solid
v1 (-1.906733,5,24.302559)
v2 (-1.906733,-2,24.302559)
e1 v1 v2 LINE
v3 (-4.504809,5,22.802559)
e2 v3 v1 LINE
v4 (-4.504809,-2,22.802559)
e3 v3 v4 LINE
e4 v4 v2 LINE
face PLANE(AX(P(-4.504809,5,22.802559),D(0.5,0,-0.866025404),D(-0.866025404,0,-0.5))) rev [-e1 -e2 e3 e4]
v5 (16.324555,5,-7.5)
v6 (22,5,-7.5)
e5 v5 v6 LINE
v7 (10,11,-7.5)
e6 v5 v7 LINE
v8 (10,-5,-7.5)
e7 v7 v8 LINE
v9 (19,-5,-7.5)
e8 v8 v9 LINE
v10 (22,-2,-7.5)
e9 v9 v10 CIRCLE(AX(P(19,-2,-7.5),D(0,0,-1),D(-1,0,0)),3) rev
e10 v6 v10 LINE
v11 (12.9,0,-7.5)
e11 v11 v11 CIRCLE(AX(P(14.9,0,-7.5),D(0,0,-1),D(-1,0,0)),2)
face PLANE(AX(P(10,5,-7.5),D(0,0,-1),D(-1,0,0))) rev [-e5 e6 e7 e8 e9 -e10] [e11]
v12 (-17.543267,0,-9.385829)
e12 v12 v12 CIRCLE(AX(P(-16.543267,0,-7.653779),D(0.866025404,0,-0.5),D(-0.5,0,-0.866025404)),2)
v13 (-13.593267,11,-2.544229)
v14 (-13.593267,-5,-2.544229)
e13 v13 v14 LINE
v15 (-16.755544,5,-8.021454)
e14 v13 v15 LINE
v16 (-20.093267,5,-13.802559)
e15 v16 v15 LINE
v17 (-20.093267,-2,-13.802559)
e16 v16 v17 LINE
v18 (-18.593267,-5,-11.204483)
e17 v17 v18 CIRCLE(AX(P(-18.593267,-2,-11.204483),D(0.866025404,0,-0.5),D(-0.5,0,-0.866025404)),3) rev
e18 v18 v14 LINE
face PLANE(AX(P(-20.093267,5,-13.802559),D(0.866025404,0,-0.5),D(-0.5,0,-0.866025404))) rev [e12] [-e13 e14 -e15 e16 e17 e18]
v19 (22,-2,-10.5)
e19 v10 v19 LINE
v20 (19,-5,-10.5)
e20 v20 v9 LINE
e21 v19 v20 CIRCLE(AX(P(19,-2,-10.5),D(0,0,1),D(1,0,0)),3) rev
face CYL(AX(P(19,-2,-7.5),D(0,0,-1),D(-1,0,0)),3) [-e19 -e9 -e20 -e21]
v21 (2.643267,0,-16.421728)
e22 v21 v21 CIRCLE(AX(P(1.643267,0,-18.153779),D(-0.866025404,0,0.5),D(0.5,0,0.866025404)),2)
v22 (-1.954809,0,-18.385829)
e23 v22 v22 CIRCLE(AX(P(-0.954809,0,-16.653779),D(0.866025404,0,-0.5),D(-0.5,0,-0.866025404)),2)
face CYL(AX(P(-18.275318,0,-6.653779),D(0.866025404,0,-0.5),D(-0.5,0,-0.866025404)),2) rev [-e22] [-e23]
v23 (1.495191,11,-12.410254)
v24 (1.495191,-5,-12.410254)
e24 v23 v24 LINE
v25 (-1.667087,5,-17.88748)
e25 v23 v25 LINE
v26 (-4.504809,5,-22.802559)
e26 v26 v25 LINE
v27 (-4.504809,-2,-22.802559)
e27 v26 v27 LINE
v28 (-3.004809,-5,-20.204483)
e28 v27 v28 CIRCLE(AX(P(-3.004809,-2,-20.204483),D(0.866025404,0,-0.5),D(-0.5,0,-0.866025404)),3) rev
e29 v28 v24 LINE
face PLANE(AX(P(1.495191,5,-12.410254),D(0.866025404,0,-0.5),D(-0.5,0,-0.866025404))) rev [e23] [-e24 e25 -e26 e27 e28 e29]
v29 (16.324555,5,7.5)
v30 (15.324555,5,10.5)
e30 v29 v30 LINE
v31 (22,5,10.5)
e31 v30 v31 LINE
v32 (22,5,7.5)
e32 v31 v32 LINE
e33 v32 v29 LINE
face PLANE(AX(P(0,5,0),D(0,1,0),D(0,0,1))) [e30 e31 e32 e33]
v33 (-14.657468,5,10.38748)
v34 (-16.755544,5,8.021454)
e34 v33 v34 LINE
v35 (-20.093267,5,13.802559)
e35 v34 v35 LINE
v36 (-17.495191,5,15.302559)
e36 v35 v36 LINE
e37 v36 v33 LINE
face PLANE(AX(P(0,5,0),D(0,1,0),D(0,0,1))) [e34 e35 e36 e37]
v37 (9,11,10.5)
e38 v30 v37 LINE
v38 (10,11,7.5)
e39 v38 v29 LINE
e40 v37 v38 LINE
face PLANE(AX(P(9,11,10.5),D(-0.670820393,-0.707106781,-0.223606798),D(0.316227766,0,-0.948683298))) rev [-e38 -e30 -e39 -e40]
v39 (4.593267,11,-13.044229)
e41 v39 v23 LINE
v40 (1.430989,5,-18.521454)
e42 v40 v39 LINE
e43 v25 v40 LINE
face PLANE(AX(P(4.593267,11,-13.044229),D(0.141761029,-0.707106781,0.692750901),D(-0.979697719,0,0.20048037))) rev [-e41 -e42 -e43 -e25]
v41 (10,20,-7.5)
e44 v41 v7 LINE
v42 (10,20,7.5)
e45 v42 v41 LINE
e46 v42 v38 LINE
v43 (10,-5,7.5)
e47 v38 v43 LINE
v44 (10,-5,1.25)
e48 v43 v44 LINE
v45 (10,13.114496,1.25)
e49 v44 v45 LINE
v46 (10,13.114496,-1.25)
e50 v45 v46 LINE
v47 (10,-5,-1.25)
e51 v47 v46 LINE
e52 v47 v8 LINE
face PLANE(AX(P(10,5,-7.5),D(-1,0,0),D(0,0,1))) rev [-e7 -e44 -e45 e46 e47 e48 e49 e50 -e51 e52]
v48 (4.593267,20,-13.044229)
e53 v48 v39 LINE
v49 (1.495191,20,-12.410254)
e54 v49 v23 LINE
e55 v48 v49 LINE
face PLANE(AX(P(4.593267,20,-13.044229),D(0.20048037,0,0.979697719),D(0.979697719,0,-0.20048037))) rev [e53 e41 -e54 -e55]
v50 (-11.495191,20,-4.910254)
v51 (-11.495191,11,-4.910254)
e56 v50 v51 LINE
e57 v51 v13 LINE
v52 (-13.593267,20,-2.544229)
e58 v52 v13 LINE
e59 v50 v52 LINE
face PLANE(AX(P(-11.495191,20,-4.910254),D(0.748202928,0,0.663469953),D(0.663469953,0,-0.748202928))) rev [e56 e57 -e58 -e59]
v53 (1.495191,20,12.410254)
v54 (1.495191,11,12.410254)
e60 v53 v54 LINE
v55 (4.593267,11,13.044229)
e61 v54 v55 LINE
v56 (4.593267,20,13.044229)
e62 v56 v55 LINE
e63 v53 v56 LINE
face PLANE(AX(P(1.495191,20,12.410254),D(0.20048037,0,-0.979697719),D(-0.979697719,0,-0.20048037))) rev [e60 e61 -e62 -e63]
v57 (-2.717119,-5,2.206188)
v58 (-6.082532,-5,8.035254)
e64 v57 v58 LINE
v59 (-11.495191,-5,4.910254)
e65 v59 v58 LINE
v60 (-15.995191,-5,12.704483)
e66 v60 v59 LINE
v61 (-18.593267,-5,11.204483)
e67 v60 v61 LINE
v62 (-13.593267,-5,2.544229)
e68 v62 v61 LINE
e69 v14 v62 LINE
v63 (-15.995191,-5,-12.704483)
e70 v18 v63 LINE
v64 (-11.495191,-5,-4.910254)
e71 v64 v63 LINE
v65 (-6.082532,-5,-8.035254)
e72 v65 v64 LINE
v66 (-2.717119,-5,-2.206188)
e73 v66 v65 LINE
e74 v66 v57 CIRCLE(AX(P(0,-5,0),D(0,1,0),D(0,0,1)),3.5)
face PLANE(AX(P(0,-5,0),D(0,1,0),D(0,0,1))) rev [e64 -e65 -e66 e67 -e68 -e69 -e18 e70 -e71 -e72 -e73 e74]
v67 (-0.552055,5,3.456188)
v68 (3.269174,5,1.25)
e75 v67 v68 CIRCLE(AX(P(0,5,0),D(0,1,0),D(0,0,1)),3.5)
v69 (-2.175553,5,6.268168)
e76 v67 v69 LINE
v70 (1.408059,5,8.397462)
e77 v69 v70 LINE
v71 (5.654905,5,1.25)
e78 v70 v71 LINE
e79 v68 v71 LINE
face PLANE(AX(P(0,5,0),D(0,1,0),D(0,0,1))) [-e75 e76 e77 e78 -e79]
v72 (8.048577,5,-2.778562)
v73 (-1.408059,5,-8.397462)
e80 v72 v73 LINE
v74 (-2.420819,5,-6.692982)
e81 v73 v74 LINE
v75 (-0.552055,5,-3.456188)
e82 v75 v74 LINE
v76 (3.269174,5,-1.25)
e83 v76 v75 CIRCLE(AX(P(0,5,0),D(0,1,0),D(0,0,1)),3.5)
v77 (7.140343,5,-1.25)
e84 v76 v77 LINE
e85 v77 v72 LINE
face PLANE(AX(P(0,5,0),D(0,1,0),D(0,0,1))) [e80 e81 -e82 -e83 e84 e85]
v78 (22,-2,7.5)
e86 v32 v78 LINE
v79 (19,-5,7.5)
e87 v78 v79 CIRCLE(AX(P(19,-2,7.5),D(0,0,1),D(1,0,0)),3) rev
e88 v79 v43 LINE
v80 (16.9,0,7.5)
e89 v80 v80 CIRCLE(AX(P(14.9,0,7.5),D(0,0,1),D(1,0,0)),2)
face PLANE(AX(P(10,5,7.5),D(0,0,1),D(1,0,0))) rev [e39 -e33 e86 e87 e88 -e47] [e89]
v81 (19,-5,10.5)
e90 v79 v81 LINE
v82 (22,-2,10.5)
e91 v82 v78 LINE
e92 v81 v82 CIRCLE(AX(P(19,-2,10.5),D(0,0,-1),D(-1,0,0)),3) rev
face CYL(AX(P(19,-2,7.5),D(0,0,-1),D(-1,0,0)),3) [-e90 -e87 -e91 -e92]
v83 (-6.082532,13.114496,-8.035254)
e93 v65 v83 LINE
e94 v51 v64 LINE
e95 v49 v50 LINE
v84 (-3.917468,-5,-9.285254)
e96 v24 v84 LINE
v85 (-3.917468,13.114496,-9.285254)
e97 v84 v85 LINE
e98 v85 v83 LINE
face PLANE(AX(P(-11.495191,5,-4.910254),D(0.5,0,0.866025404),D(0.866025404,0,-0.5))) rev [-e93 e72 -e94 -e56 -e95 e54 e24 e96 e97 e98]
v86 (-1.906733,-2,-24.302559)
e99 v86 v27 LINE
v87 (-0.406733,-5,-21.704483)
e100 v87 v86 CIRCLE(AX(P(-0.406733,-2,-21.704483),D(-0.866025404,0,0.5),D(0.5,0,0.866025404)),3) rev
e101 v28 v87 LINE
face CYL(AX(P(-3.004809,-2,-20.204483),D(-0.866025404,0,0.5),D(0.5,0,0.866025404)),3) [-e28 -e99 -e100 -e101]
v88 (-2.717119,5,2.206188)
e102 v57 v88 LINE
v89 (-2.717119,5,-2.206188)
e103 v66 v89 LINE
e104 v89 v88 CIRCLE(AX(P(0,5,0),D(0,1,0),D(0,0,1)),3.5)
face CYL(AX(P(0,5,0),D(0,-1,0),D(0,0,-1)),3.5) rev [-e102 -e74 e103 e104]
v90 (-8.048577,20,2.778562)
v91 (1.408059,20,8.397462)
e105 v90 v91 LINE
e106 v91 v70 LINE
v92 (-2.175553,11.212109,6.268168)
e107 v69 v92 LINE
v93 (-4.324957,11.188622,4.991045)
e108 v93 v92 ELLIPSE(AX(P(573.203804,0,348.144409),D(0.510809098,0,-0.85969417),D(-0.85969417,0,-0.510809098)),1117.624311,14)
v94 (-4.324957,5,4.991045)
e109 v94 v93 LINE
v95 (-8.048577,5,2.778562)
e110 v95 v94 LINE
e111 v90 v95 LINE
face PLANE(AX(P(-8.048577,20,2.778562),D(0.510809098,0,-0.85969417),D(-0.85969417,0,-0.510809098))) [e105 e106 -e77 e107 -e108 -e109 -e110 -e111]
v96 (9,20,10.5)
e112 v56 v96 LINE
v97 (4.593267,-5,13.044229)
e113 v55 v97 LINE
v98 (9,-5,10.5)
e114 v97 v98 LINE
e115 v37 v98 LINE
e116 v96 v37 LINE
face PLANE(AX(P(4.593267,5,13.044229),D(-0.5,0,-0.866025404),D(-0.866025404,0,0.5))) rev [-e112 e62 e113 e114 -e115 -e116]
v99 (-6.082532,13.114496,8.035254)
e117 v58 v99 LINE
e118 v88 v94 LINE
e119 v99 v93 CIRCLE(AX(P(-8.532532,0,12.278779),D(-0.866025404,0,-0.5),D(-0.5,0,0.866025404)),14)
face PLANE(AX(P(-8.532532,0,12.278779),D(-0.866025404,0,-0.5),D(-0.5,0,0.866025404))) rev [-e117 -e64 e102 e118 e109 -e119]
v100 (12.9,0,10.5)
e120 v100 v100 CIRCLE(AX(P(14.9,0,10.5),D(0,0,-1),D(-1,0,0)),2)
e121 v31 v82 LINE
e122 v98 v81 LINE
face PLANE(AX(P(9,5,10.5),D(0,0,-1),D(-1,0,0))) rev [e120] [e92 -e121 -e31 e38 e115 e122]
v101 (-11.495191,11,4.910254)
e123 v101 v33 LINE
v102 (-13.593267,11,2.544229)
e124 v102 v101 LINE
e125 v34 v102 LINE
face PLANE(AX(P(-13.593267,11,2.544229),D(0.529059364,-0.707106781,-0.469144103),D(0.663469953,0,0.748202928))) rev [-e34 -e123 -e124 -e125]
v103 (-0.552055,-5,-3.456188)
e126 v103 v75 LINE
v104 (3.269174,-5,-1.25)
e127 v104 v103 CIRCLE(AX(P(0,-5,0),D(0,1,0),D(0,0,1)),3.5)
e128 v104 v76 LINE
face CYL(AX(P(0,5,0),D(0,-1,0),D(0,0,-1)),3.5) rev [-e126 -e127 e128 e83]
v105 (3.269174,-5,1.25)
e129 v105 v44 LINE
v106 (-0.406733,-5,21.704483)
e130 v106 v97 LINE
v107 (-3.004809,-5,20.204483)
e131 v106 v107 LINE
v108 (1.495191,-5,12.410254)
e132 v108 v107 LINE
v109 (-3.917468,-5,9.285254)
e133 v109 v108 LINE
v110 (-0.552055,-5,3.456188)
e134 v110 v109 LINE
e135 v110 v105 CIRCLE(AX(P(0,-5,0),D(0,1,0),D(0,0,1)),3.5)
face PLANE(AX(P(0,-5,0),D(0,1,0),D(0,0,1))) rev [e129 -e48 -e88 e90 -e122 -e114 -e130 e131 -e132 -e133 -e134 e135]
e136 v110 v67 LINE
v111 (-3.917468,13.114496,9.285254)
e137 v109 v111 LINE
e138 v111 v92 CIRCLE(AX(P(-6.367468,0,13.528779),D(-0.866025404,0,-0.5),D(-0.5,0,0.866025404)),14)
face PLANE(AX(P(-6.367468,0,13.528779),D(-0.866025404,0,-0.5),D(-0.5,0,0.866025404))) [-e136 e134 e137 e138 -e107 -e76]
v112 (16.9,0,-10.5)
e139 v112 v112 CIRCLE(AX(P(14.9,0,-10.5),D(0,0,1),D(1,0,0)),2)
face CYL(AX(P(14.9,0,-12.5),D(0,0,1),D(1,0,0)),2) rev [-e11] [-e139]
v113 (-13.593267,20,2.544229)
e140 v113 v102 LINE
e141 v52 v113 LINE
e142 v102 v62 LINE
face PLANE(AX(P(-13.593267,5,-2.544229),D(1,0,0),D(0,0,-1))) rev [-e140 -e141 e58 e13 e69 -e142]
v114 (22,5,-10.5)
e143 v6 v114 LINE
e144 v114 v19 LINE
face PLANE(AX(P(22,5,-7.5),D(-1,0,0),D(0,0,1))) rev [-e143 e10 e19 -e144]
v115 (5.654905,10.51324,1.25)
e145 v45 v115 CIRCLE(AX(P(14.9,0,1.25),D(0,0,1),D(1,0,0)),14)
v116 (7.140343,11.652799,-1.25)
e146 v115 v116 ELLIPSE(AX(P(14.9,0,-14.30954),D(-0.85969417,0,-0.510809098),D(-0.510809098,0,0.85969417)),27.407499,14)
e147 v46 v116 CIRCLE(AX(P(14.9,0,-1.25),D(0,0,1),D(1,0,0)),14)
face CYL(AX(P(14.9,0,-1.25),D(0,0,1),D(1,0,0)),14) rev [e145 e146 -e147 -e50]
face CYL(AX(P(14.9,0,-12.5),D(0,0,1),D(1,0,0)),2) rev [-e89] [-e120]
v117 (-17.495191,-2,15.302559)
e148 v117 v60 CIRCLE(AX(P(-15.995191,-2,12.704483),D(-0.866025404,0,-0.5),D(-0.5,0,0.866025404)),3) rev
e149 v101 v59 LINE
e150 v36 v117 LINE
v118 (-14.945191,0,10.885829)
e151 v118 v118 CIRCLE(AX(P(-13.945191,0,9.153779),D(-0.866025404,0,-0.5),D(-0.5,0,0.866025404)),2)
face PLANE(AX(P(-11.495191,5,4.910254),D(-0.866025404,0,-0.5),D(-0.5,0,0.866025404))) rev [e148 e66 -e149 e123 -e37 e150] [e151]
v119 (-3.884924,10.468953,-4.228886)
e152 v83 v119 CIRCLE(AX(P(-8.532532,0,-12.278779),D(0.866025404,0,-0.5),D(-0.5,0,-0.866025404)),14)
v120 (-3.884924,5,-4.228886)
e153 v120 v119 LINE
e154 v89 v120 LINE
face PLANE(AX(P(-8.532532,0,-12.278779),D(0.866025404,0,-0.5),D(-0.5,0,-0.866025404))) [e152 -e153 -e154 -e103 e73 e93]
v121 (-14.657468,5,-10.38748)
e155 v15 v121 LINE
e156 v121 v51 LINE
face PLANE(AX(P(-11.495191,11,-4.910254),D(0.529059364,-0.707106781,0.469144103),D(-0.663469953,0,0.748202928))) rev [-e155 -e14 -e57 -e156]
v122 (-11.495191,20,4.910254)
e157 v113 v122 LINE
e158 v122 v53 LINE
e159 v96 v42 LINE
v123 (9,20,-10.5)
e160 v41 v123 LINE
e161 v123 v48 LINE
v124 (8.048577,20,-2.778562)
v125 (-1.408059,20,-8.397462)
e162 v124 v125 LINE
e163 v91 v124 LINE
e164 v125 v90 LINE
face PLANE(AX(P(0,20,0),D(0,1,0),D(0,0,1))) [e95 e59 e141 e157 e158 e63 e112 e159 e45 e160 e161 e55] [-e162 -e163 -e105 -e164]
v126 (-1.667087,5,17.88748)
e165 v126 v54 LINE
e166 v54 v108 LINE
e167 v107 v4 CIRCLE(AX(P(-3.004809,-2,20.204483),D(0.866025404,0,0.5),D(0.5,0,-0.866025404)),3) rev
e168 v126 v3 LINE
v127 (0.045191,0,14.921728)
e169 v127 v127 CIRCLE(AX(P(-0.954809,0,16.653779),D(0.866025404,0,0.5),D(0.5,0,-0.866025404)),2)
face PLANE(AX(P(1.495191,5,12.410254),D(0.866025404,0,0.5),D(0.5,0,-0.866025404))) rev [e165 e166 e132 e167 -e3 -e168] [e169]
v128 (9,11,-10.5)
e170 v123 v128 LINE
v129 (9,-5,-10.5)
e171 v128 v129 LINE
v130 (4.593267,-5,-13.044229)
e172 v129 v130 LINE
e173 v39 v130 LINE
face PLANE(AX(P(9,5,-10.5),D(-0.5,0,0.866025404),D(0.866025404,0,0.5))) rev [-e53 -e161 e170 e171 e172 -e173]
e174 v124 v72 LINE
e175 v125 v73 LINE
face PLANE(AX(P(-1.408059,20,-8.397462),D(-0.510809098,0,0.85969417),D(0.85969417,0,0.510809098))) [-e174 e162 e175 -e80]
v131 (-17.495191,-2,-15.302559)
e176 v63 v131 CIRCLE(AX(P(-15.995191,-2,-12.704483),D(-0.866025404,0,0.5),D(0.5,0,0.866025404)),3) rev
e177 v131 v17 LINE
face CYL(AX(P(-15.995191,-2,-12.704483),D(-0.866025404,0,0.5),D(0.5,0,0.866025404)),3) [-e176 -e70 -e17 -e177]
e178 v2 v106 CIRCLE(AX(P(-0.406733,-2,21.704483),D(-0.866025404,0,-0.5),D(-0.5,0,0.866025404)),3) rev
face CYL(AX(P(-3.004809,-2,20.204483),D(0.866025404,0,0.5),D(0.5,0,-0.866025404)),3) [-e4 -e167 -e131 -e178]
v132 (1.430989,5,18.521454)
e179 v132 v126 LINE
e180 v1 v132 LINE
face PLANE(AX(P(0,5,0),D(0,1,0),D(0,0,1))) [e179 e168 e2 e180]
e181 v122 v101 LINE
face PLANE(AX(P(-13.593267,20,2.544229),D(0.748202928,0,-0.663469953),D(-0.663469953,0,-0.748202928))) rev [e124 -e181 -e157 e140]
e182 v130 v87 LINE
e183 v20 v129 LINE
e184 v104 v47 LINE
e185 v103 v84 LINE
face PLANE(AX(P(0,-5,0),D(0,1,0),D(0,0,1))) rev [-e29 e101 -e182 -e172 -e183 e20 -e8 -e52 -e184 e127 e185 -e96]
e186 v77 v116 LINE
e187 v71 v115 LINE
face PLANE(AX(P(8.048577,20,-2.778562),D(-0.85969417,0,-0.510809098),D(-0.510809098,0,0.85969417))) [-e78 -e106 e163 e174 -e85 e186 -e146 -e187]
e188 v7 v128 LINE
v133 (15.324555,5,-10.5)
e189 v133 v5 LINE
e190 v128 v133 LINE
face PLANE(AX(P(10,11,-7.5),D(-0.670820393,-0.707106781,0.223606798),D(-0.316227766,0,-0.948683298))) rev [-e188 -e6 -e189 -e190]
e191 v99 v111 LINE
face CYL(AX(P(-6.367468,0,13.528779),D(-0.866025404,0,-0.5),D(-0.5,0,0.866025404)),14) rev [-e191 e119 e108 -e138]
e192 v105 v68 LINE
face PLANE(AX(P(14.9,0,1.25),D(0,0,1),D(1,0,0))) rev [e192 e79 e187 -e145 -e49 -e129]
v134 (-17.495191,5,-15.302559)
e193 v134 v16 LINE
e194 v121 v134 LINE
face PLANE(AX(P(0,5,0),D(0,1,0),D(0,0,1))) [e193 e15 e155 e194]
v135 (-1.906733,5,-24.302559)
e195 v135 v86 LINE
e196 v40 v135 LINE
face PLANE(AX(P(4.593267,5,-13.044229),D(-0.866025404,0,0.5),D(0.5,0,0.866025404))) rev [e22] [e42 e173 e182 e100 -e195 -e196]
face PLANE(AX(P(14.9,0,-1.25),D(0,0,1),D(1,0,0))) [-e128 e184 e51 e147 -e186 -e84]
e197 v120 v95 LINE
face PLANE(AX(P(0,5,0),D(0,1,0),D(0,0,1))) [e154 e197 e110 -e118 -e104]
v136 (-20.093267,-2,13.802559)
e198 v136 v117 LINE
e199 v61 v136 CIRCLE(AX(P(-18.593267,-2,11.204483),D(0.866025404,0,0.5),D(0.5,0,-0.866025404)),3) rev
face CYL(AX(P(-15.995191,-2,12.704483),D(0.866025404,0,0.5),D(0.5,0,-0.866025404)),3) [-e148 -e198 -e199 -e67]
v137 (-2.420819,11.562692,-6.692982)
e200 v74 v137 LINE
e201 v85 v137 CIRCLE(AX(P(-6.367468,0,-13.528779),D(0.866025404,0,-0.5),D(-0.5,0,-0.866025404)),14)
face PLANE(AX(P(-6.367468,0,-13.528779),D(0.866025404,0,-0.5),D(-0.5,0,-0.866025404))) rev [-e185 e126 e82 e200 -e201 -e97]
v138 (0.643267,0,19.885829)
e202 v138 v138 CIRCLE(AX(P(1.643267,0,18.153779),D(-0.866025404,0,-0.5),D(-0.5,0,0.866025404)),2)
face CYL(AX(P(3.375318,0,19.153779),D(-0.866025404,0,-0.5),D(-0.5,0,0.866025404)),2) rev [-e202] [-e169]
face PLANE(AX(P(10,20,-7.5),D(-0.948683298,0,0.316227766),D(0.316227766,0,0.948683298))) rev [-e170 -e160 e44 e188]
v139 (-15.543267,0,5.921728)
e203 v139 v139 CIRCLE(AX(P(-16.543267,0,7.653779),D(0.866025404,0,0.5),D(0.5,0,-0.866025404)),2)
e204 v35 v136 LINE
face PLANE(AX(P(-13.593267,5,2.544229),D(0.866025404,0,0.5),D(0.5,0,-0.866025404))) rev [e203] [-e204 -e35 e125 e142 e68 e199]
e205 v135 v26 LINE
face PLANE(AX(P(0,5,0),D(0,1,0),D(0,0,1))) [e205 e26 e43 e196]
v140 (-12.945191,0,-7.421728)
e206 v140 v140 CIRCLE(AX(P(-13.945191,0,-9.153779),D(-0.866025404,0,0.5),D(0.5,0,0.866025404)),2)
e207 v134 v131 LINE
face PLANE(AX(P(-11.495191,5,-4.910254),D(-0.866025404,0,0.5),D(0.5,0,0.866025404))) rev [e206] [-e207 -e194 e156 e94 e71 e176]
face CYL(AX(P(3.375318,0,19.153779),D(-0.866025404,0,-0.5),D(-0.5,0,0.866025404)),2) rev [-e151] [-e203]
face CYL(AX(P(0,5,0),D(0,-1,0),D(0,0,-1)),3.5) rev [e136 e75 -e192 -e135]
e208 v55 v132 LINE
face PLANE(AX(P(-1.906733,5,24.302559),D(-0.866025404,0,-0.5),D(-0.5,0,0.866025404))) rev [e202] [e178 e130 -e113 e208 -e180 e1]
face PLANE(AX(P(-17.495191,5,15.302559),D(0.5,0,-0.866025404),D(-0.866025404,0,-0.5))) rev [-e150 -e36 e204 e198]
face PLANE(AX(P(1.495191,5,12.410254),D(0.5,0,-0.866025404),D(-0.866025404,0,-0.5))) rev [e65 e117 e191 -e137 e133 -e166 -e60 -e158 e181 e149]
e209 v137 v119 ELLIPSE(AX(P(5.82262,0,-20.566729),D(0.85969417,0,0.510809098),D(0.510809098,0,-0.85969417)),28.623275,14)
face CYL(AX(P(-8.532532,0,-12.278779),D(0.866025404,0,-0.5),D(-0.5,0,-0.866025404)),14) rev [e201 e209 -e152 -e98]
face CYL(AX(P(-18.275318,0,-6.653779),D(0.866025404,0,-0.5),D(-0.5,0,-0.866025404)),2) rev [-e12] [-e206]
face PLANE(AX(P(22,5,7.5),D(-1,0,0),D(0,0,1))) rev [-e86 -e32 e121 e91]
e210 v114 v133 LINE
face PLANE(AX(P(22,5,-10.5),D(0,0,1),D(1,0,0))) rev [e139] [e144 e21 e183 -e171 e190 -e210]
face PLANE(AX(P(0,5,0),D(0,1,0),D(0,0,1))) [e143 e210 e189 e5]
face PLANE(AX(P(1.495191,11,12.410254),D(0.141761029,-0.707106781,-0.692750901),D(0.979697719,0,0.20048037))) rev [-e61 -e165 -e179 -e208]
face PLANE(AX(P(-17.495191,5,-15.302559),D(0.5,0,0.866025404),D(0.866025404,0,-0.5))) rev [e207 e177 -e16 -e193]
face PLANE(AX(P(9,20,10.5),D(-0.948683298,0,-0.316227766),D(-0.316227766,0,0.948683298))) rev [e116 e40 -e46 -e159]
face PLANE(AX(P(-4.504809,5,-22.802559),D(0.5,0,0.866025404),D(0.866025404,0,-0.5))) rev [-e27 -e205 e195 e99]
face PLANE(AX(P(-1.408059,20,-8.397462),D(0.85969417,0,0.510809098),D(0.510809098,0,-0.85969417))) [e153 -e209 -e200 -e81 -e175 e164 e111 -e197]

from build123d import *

# Parameters (mm, degrees)
SKETCH1_R           = 3.5
BOSS_EXTRUDE1_DEPTH = 5
SKETCH2_R           = 2
CUT_EXTRUDE1_DEPTH  = 12.5
BOSS_EXTRUDE2_DEPTH = 15
CHAMFER1_SIZE       = 6
FILLET1_R           = 3
SKETCH6_R           = 14
CUT_EXTRUDE2_DEPTH  = 1.25
CIRPATTERN1_COUNT   = 3


with BuildPart() as part:
    # Sketch1 → Boss-Extrude1 (new, symmetric)
    with BuildSketch(Plane(origin=(0, 0, 0), x_dir=(1, 0, 0), z_dir=(0, 1, 0))):
        Polygon((10, 7.5), (10, -7.5), (22, -7.5), (22, -10.5), (9, -10.5), (4.59326674, -13.044228634), (-1.90673326, -24.302558883), (-4.504809472, -22.802558883), (1.495190528, -12.410254038), (-11.495190528, -4.910254038), (-17.495190528, -15.302558883), (-20.09326674, -13.802558883), (-13.59326674, -2.544228634), (-13.59326674, 2.544228634), (-20.09326674, 13.802558883), (-17.495190528, 15.302558883), (-11.495190528, 4.910254038), (1.495190528, 12.410254038), (-4.504809472, 22.802558883), (-1.90673326, 24.302558883), (4.59326674, 13.044228634), (9, 10.5), (22, 10.5), (22, 7.5), align=None)
        with Locations(Location((0, 0, 0), (0, 0, 270))):
            Circle(SKETCH1_R, mode=Mode.SUBTRACT)
    extrude(amount=BOSS_EXTRUDE1_DEPTH, both=True)

    # Sketch2 → Cut-Extrude1 (cut, symmetric)
    with BuildSketch(Plane(origin=(6.062177826, 0, 0), x_dir=(1, 0, 0), z_dir=(0, 0, 1))):
        with Locations((8.837822174, 0)):
            Circle(SKETCH2_R)
    cut_extrude1 = extrude(amount=CUT_EXTRUDE1_DEPTH, both=True, mode=Mode.SUBTRACT)

    # Sketch5 → Boss-Extrude2 (add)
    with BuildSketch(Plane(origin=(0, 5, 0), x_dir=(1, 0, 0), z_dir=(0, 1, 0))):
        Polygon((-11.495190528, 4.910254038), (-13.59326674, 2.544228634), (-13.59326674, -2.544228634), (-11.495190528, -4.910254038), (1.495190528, -12.410254038), (4.59326674, -13.044228634), (9, -10.5), (10, -7.5), (10, 7.5), (9, 10.5), (4.59326674, 13.044228634), (1.495190528, 12.410254038), align=None)
        Polygon((-1.408058794, 8.397462142), (8.048577071, 2.778562062), (1.408058794, -8.397462142), (-8.048577071, -2.778562062), align=None, mode=Mode.SUBTRACT)
    extrude(amount=BOSS_EXTRUDE2_DEPTH)

    # Chamfer1
    # the kernel refuses this chamfer: 6 mm, written as the material it adds along each edge
    with BuildSketch(Plane(origin=(14.879425397, 5, 7.138276191), x_dir=(0.9483246169389857, -0.027495876610586355, -0.31610820564632863), z_dir=(-0.31622776601683794, 0, -0.9486832980505138))) as chamfer1_piece_1_section:
        Polygon((CHAMFER1_SIZE * 0.999621916911, -CHAMFER1_SIZE * 0.0274958766106), (-CHAMFER1_SIZE * 0.0274958766106, -CHAMFER1_SIZE * 0.999621916911), (0, 0), align=None)
    chamfer1_piece_1 = extrude(amount=34.022473516, mode=Mode.PRIVATE)
    chamfer1_piece_1 = split(chamfer1_piece_1, bisect_by=Plane(origin=(10, 7.238305373, -8.343587756), z_dir=(1, 0, 0)), keep=Keep.TOP, mode=Mode.PRIVATE)
    chamfer1_piece_1 = split(chamfer1_piece_1, bisect_by=Plane(origin=(11.214187952, 7.238305373, -7.5), z_dir=(0, 0, -1)), keep=Keep.TOP, mode=Mode.PRIVATE)
    chamfer1_piece_1 = split(chamfer1_piece_1, bisect_by=Plane(origin=(11.594394856, 7.238305373, -9.002125431), z_dir=(-0.5000000000000008, 0, 0.8660254037844383)), keep=Keep.TOP, mode=Mode.PRIVATE)
    add(chamfer1_piece_1)
    with BuildSketch(Plane(origin=(14.879425397, 5, 7.138276191), x_dir=(0.9483246169389857, -0.027495876610586355, -0.31610820564632863), z_dir=(-0.31622776601683794, 0, -0.9486832980505138))) as chamfer1_piece_2_section:
        Polygon((CHAMFER1_SIZE * 0.999621916911, -CHAMFER1_SIZE * 0.0274958766106), (-CHAMFER1_SIZE * 0.0274958766106, -CHAMFER1_SIZE * 0.999621916911), (0, 0), align=None)
    chamfer1_piece_2 = extrude(amount=34.022473516, mode=Mode.PRIVATE)
    chamfer1_piece_2 = split(chamfer1_piece_2, bisect_by=Plane(origin=(10, 8.044690519, -9.214105908), z_dir=(-1, 0, 0)), keep=Keep.TOP, mode=Mode.PRIVATE)
    chamfer1_piece_2 = split(chamfer1_piece_2, bisect_by=Plane(origin=(9.590387414, 8.044690519, -7.5), z_dir=(0, 0, -1)), keep=Keep.TOP, mode=Mode.PRIVATE)
    chamfer1_piece_2 = split(chamfer1_piece_2, bisect_by=Plane(origin=(9.590387414, 8.044690519, -10.5), z_dir=(0, 0, 1)), keep=Keep.TOP, mode=Mode.PRIVATE)
    chamfer1_piece_2 = split(chamfer1_piece_2, bisect_by=Plane(origin=(9.999599036, 8.044690519, -9.922881228), z_dir=(-0.5000000000000008, 0, 0.8660254037844383)), keep=Keep.TOP, mode=Mode.PRIVATE)
    add(chamfer1_piece_2)
    with BuildSketch(Plane(origin=(14.879425397, 5, 7.138276191), x_dir=(0.9483246169389857, -0.027495876610586355, -0.31610820564632863), z_dir=(-0.31622776601683794, 0, -0.9486832980505138))) as chamfer1_piece_3_section:
        Polygon((CHAMFER1_SIZE * 0.999621916911, -CHAMFER1_SIZE * 0.0274958766106), (-CHAMFER1_SIZE * 0.0274958766106, -CHAMFER1_SIZE * 0.999621916911), (0, 0), align=None)
    chamfer1_piece_3 = extrude(amount=34.022473516, mode=Mode.PRIVATE)
    chamfer1_piece_3 = split(chamfer1_piece_3, bisect_by=Plane(origin=(10, 6.348975917, -9.386892546), z_dir=(1, 0, 0)), keep=Keep.TOP, mode=Mode.PRIVATE)
    chamfer1_piece_3 = split(chamfer1_piece_3, bisect_by=Plane(origin=(12.707905093, 6.348975917, -7.5), z_dir=(0, 0, -1)), keep=Keep.TOP, mode=Mode.PRIVATE)
    chamfer1_piece_3 = split(chamfer1_piece_3, bisect_by=Plane(origin=(12.707905093, 6.348975917, -10.5), z_dir=(0, 0, 1)), keep=Keep.TOP, mode=Mode.PRIVATE)
    chamfer1_piece_3 = split(chamfer1_piece_3, bisect_by=Plane(origin=(12.262918486, 6.348975917, -8.616153134), z_dir=(0.5000000000000008, 0, -0.8660254037844383)), keep=Keep.TOP, mode=Mode.PRIVATE)
    add(chamfer1_piece_3)
    with BuildSketch(Plane(origin=(14.879425397, 5, 7.138276191), x_dir=(0.9483246169389857, -0.027495876610586355, -0.31610820564632863), z_dir=(-0.31622776601683794, 0, -0.9486832980505138))) as chamfer1_piece_4_section:
        Polygon((CHAMFER1_SIZE * 0.999621916911, -CHAMFER1_SIZE * 0.0274958766106), (-CHAMFER1_SIZE * 0.0274958766106, -CHAMFER1_SIZE * 0.999621916911), (0, 0), align=None)
    chamfer1_piece_4 = extrude(amount=34.022473516, mode=Mode.PRIVATE)
    chamfer1_piece_4 = split(chamfer1_piece_4, bisect_by=Plane(origin=(10, 7.664220287, -10.309273658), z_dir=(-1, 0, 0)), keep=Keep.TOP, mode=Mode.PRIVATE)
    chamfer1_piece_4 = split(chamfer1_piece_4, bisect_by=Plane(origin=(9.657905234, 7.664220287, -10.5), z_dir=(0, 0, 1)), keep=Keep.TOP, mode=Mode.PRIVATE)
    chamfer1_piece_4 = split(chamfer1_piece_4, bisect_by=Plane(origin=(9.576015854, 7.664220287, -10.167437092), z_dir=(0.5000000000000008, 0, -0.8660254037844383)), keep=Keep.TOP, mode=Mode.PRIVATE)
    add(chamfer1_piece_4)
    with BuildSketch(Plane(origin=(19.710098488, 5, -16.13766038), x_dir=(-0.20040457203505768, -0.027495876610586337, -0.9793273121264722), z_dir=(-0.979697719266168, 0, 0.2004803702726748))) as chamfer1_piece_5_section:
        Polygon((CHAMFER1_SIZE * 0.999621916911, -CHAMFER1_SIZE * 0.0274958766106), (-CHAMFER1_SIZE * 0.0274958766106, -CHAMFER1_SIZE * 0.999621916911), (0, 0), align=None)
    chamfer1_piece_5 = extrude(amount=34.022473516, mode=Mode.PRIVATE)
    chamfer1_piece_5 = split(chamfer1_piece_5, bisect_by=Plane(origin=(3.928092882, 7.664220287, -13.814890867), z_dir=(0.5000000000000004, 0, 0.8660254037844385)), keep=Keep.TOP, mode=Mode.PRIVATE)
    chamfer1_piece_5 = split(chamfer1_piece_5, bisect_by=Plane(origin=(4.264314123, 7.664220287, -13.61399128), z_dir=(-0.8660254037844384, 0, 0.5000000000000006)), keep=Keep.TOP, mode=Mode.PRIVATE)
    chamfer1_piece_5 = split(chamfer1_piece_5, bisect_by=Plane(origin=(4.017250886, 7.664220287, -13.376791542), z_dir=(0.5000000000000008, 0, -0.8660254037844383)), keep=Keep.TOP, mode=Mode.PRIVATE)
    add(chamfer1_piece_5)
    with BuildSketch(Plane(origin=(19.710098488, 5, -16.13766038), x_dir=(-0.20040457203505768, -0.027495876610586337, -0.9793273121264722), z_dir=(-0.979697719266168, 0, 0.2004803702726748))) as chamfer1_piece_6_section:
        Polygon((CHAMFER1_SIZE * 0.999621916911, -CHAMFER1_SIZE * 0.0274958766106), (-CHAMFER1_SIZE * 0.0274958766106, -CHAMFER1_SIZE * 0.999621916911), (0, 0), align=None)
    chamfer1_piece_6 = extrude(amount=34.022473516, mode=Mode.PRIVATE)
    chamfer1_piece_6 = split(chamfer1_piece_6, bisect_by=Plane(origin=(2.97964979, 8.044690519, -13.267306992), z_dir=(0.5000000000000004, 0, 0.8660254037844385)), keep=Keep.TOP, mode=Mode.PRIVATE)
    chamfer1_piece_6 = split(chamfer1_piece_6, bisect_by=Plane(origin=(1.699996821, 8.044690519, -12.055519133), z_dir=(0.8660254037844385, 0, -0.5000000000000004)), keep=Keep.TOP, mode=Mode.PRIVATE)
    chamfer1_piece_6 = split(chamfer1_piece_6, bisect_by=Plane(origin=(4.298073033, 8.044690519, -13.555519133), z_dir=(-0.8660254037844384, 0, 0.5000000000000006)), keep=Keep.TOP, mode=Mode.PRIVATE)
    chamfer1_piece_6 = split(chamfer1_piece_6, bisect_by=Plane(origin=(3.593667704, 8.044690519, -13.621347406), z_dir=(-0.5000000000000008, 0, 0.8660254037844383)), keep=Keep.TOP, mode=Mode.PRIVATE)
    add(chamfer1_piece_6)
    with BuildSketch(Plane(origin=(19.710098488, 5, -16.13766038), x_dir=(-0.20040457203505768, -0.027495876610586337, -0.9793273121264722), z_dir=(-0.979697719266168, 0, 0.2004803702726748))) as chamfer1_piece_7_section:
        Polygon((CHAMFER1_SIZE * 0.999621916911, -CHAMFER1_SIZE * 0.0274958766106), (-CHAMFER1_SIZE * 0.0274958766106, -CHAMFER1_SIZE * 0.999621916911), (0, 0), align=None)
    chamfer1_piece_7 = extrude(amount=34.022473516, mode=Mode.PRIVATE)
    chamfer1_piece_7 = split(chamfer1_piece_7, bisect_by=Plane(origin=(3.129287407, 6.348975917, -13.353700311), z_dir=(-0.5000000000000004, 0, -0.8660254037844385)), keep=Keep.TOP, mode=Mode.PRIVATE)
    chamfer1_piece_7 = split(chamfer1_piece_7, bisect_by=Plane(origin=(0.141237982, 6.348975917, -14.755368639), z_dir=(0.8660254037844385, 0, -0.5000000000000004)), keep=Keep.TOP, mode=Mode.PRIVATE)
    chamfer1_piece_7 = split(chamfer1_piece_7, bisect_by=Plane(origin=(2.739314193, 6.348975917, -16.255368639), z_dir=(-0.8660254037844384, 0, 0.5000000000000006)), keep=Keep.TOP, mode=Mode.PRIVATE)
    chamfer1_piece_7 = split(chamfer1_piece_7, bisect_by=Plane(origin=(1.330348254, 6.348975917, -14.9280755), z_dir=(0.5000000000000008, 0, -0.8660254037844383)), keep=Keep.TOP, mode=Mode.PRIVATE)
    add(chamfer1_piece_7)
    with BuildSketch(Plane(origin=(19.710098488, 5, -16.13766038), x_dir=(-0.20040457203505768, -0.027495876610586337, -0.9793273121264722), z_dir=(-0.979697719266168, 0, 0.2004803702726748))) as chamfer1_piece_8_section:
        Polygon((CHAMFER1_SIZE * 0.999621916911, -CHAMFER1_SIZE * 0.0274958766106), (-CHAMFER1_SIZE * 0.0274958766106, -CHAMFER1_SIZE * 0.999621916911), (0, 0), align=None)
    chamfer1_piece_8 = extrude(amount=34.022473516, mode=Mode.PRIVATE)
    chamfer1_piece_8 = split(chamfer1_piece_8, bisect_by=Plane(origin=(2.225758955, 7.238305373, -12.832047916), z_dir=(-0.5000000000000004, 0, -0.8660254037844385)), keep=Keep.TOP, mode=Mode.PRIVATE)
    chamfer1_piece_8 = split(chamfer1_piece_8, bisect_by=Plane(origin=(0.888096553, 7.238305373, -13.461771649), z_dir=(0.8660254037844385, 0, -0.5000000000000004)), keep=Keep.TOP, mode=Mode.PRIVATE)
    chamfer1_piece_8 = split(chamfer1_piece_8, bisect_by=Plane(origin=(1.998871884, 7.238305373, -14.542103203), z_dir=(-0.5000000000000008, 0, 0.8660254037844383)), keep=Keep.TOP, mode=Mode.PRIVATE)
    add(chamfer1_piece_8)
    with BuildSketch(Plane(origin=(-1.257784178, 5, -16.455098483), x_dir=(-0.7479200449039286, -0.027495876610586348, -0.6632191064801443), z_dir=(-0.6634699532493307, 0, 0.7482029277778397))) as chamfer1_piece_9_section:
        Polygon((CHAMFER1_SIZE * 0.999621916911, -CHAMFER1_SIZE * 0.0274958766106), (-CHAMFER1_SIZE * 0.0274958766106, -CHAMFER1_SIZE * 0.999621916911), (0, 0), align=None)
    chamfer1_piece_9 = extrude(amount=34.022473516, mode=Mode.PRIVATE)
    chamfer1_piece_9 = split(chamfer1_piece_9, bisect_by=Plane(origin=(-13.59326674, 7.238305373, -5.539977771), z_dir=(1, 0, 0)), keep=Keep.TOP, mode=Mode.PRIVATE)
    chamfer1_piece_9 = split(chamfer1_piece_9, bisect_by=Plane(origin=(-12.102284504, 7.238305373, -5.961771649), z_dir=(-0.8660254037844383, 0, 0.5000000000000007)), keep=Keep.TOP, mode=Mode.PRIVATE)
    chamfer1_piece_9 = split(chamfer1_piece_9, bisect_by=Plane(origin=(-12.225758955, 7.238305373, -4.48846016), z_dir=(-0.5000000000000004, 0, -0.8660254037844385)), keep=Keep.TOP, mode=Mode.PRIVATE)
    add(chamfer1_piece_9)
    with BuildSketch(Plane(origin=(-1.257784178, 5, -16.455098483), x_dir=(-0.7479200449039286, -0.027495876610586348, -0.6632191064801443), z_dir=(-0.6634699532493307, 0, 0.7482029277778397))) as chamfer1_piece_10_section:
        Polygon((CHAMFER1_SIZE * 0.999621916911, -CHAMFER1_SIZE * 0.0274958766106), (-CHAMFER1_SIZE * 0.0274958766106, -CHAMFER1_SIZE * 0.999621916911), (0, 0), align=None)
    chamfer1_piece_10 = extrude(amount=34.022473516, mode=Mode.PRIVATE)
    chamfer1_piece_10 = split(chamfer1_piece_10, bisect_by=Plane(origin=(-13.59326674, 8.044690519, -3.698466179), z_dir=(1, 0, 0)), keep=Keep.TOP, mode=Mode.PRIVATE)
    chamfer1_piece_10 = split(chamfer1_piece_10, bisect_by=Plane(origin=(-13.888460447, 8.044690519, -3.055519133), z_dir=(0.8660254037844386, 0, -0.5000000000000001)), keep=Keep.TOP, mode=Mode.PRIVATE)
    chamfer1_piece_10 = split(chamfer1_piece_10, bisect_by=Plane(origin=(-11.290384235, 8.044690519, -4.555519133), z_dir=(-0.8660254037844383, 0, 0.5000000000000007)), keep=Keep.TOP, mode=Mode.PRIVATE)
    chamfer1_piece_10 = split(chamfer1_piece_10, bisect_by=Plane(origin=(-12.97964979, 8.044690519, -4.053201084), z_dir=(0.5000000000000004, 0, 0.8660254037844385)), keep=Keep.TOP, mode=Mode.PRIVATE)
    add(chamfer1_piece_10)
    with BuildSketch(Plane(origin=(-1.257784178, 5, -16.455098483), x_dir=(-0.7479200449039286, -0.027495876610586348, -0.6632191064801443), z_dir=(-0.6634699532493307, 0, 0.7482029277778397))) as chamfer1_piece_11_section:
        Polygon((CHAMFER1_SIZE * 0.999621916911, -CHAMFER1_SIZE * 0.0274958766106), (-CHAMFER1_SIZE * 0.0274958766106, -CHAMFER1_SIZE * 0.999621916911), (0, 0), align=None)
    chamfer1_piece_11 = extrude(amount=34.022473516, mode=Mode.PRIVATE)
    chamfer1_piece_11 = split(chamfer1_piece_11, bisect_by=Plane(origin=(-13.59326674, 6.348975917, -6.311922367), z_dir=(-1, 0, 0)), keep=Keep.TOP, mode=Mode.PRIVATE)
    chamfer1_piece_11 = split(chamfer1_piece_11, bisect_by=Plane(origin=(-15.447219286, 6.348975917, -5.755368639), z_dir=(0.8660254037844386, 0, -0.5000000000000001)), keep=Keep.TOP, mode=Mode.PRIVATE)
    chamfer1_piece_11 = split(chamfer1_piece_11, bisect_by=Plane(origin=(-12.849143075, 6.348975917, -7.255368639), z_dir=(-0.8660254037844383, 0, 0.5000000000000007)), keep=Keep.TOP, mode=Mode.PRIVATE)
    chamfer1_piece_11 = split(chamfer1_piece_11, bisect_by=Plane(origin=(-13.129287407, 6.348975917, -3.966807765), z_dir=(-0.5000000000000004, 0, -0.8660254037844385)), keep=Keep.TOP, mode=Mode.PRIVATE)
    add(chamfer1_piece_11)
    with BuildSketch(Plane(origin=(-1.257784178, 5, -16.455098483), x_dir=(-0.7479200449039286, -0.027495876610586348, -0.6632191064801443), z_dir=(-0.6634699532493307, 0, 0.7482029277778397))) as chamfer1_piece_12_section:
        Polygon((CHAMFER1_SIZE * 0.999621916911, -CHAMFER1_SIZE * 0.0274958766106), (-CHAMFER1_SIZE * 0.0274958766106, -CHAMFER1_SIZE * 0.999621916911), (0, 0), align=None)
    chamfer1_piece_12 = extrude(amount=34.022473516, mode=Mode.PRIVATE)
    chamfer1_piece_12 = split(chamfer1_piece_12, bisect_by=Plane(origin=(-13.59326674, 7.664220287, -3.209354451), z_dir=(-1, 0, 0)), keep=Keep.TOP, mode=Mode.PRIVATE)
    chamfer1_piece_12 = split(chamfer1_piece_12, bisect_by=Plane(origin=(-13.922219357, 7.664220287, -3.11399128), z_dir=(0.8660254037844386, 0, -0.5000000000000001)), keep=Keep.TOP, mode=Mode.PRIVATE)
    chamfer1_piece_12 = split(chamfer1_piece_12, bisect_by=Plane(origin=(-13.928092882, 7.664220287, -3.505617209), z_dir=(0.5000000000000004, 0, 0.8660254037844385)), keep=Keep.TOP, mode=Mode.PRIVATE)
    add(chamfer1_piece_12)
    with BuildSketch(Plane(origin=(-23.830673091, 5, -9.000615811), x_dir=(-0.7479200449039286, -0.027495876610586348, 0.6632191064801441), z_dir=(0.6634699532493307, 0, 0.7482029277778397))) as chamfer1_piece_13_section:
        Polygon((CHAMFER1_SIZE * 0.999621916911, -CHAMFER1_SIZE * 0.0274958766106), (-CHAMFER1_SIZE * 0.0274958766106, -CHAMFER1_SIZE * 0.999621916911), (0, 0), align=None)
    chamfer1_piece_13 = extrude(amount=34.022473516, mode=Mode.PRIVATE)
    chamfer1_piece_13 = split(chamfer1_piece_13, bisect_by=Plane(origin=(-13.928092882, 7.664220287, 3.505617209), z_dir=(0.4999999999999998, 0, -0.8660254037844388)), keep=Keep.TOP, mode=Mode.PRIVATE)
    chamfer1_piece_13 = split(chamfer1_piece_13, bisect_by=Plane(origin=(-13.922219357, 7.664220287, 3.11399128), z_dir=(0.8660254037844388, 0, 0.49999999999999983)), keep=Keep.TOP, mode=Mode.PRIVATE)
    chamfer1_piece_13 = split(chamfer1_piece_13, bisect_by=Plane(origin=(-13.59326674, 7.664220287, 3.209354451), z_dir=(-1, 0, 0)), keep=Keep.TOP, mode=Mode.PRIVATE)
    add(chamfer1_piece_13)
    with BuildSketch(Plane(origin=(-23.830673091, 5, -9.000615811), x_dir=(-0.7479200449039286, -0.027495876610586348, 0.6632191064801441), z_dir=(0.6634699532493307, 0, 0.7482029277778397))) as chamfer1_piece_14_section:
        Polygon((CHAMFER1_SIZE * 0.999621916911, -CHAMFER1_SIZE * 0.0274958766106), (-CHAMFER1_SIZE * 0.0274958766106, -CHAMFER1_SIZE * 0.999621916911), (0, 0), align=None)
    chamfer1_piece_14 = extrude(amount=34.022473516, mode=Mode.PRIVATE)
    chamfer1_piece_14 = split(chamfer1_piece_14, bisect_by=Plane(origin=(-12.97964979, 8.044690519, 4.053201084), z_dir=(0.4999999999999998, 0, -0.8660254037844388)), keep=Keep.TOP, mode=Mode.PRIVATE)
    chamfer1_piece_14 = split(chamfer1_piece_14, bisect_by=Plane(origin=(-11.290384235, 8.044690519, 4.555519133), z_dir=(-0.8660254037844388, 0, -0.4999999999999999)), keep=Keep.TOP, mode=Mode.PRIVATE)
    chamfer1_piece_14 = split(chamfer1_piece_14, bisect_by=Plane(origin=(-13.888460447, 8.044690519, 3.055519133), z_dir=(0.8660254037844388, 0, 0.49999999999999983)), keep=Keep.TOP, mode=Mode.PRIVATE)
    chamfer1_piece_14 = split(chamfer1_piece_14, bisect_by=Plane(origin=(-13.59326674, 8.044690519, 3.698466179), z_dir=(1, 0, 0)), keep=Keep.TOP, mode=Mode.PRIVATE)
    add(chamfer1_piece_14)
    with BuildSketch(Plane(origin=(-23.830673091, 5, -9.000615811), x_dir=(-0.7479200449039286, -0.027495876610586348, 0.6632191064801441), z_dir=(0.6634699532493307, 0, 0.7482029277778397))) as chamfer1_piece_15_section:
        Polygon((CHAMFER1_SIZE * 0.999621916911, -CHAMFER1_SIZE * 0.0274958766106), (-CHAMFER1_SIZE * 0.0274958766106, -CHAMFER1_SIZE * 0.999621916911), (0, 0), align=None)
    chamfer1_piece_15 = extrude(amount=34.022473516, mode=Mode.PRIVATE)
    chamfer1_piece_15 = split(chamfer1_piece_15, bisect_by=Plane(origin=(-13.129287407, 6.348975917, 3.966807765), z_dir=(-0.4999999999999998, 0, 0.8660254037844388)), keep=Keep.TOP, mode=Mode.PRIVATE)
    chamfer1_piece_15 = split(chamfer1_piece_15, bisect_by=Plane(origin=(-12.849143075, 6.348975917, 7.255368639), z_dir=(-0.8660254037844388, 0, -0.4999999999999999)), keep=Keep.TOP, mode=Mode.PRIVATE)
    chamfer1_piece_15 = split(chamfer1_piece_15, bisect_by=Plane(origin=(-15.447219286, 6.348975917, 5.755368639), z_dir=(0.8660254037844388, 0, 0.49999999999999983)), keep=Keep.TOP, mode=Mode.PRIVATE)
    chamfer1_piece_15 = split(chamfer1_piece_15, bisect_by=Plane(origin=(-13.59326674, 6.348975917, 6.311922367), z_dir=(-1, 0, 0)), keep=Keep.TOP, mode=Mode.PRIVATE)
    add(chamfer1_piece_15)
    with BuildSketch(Plane(origin=(-23.830673091, 5, -9.000615811), x_dir=(-0.7479200449039286, -0.027495876610586348, 0.6632191064801441), z_dir=(0.6634699532493307, 0, 0.7482029277778397))) as chamfer1_piece_16_section:
        Polygon((CHAMFER1_SIZE * 0.999621916911, -CHAMFER1_SIZE * 0.0274958766106), (-CHAMFER1_SIZE * 0.0274958766106, -CHAMFER1_SIZE * 0.999621916911), (0, 0), align=None)
    chamfer1_piece_16 = extrude(amount=34.022473516, mode=Mode.PRIVATE)
    chamfer1_piece_16 = split(chamfer1_piece_16, bisect_by=Plane(origin=(-12.225758955, 7.238305373, 4.48846016), z_dir=(-0.4999999999999998, 0, 0.8660254037844388)), keep=Keep.TOP, mode=Mode.PRIVATE)
    chamfer1_piece_16 = split(chamfer1_piece_16, bisect_by=Plane(origin=(-12.102284504, 7.238305373, 5.961771649), z_dir=(-0.8660254037844388, 0, -0.4999999999999999)), keep=Keep.TOP, mode=Mode.PRIVATE)
    chamfer1_piece_16 = split(chamfer1_piece_16, bisect_by=Plane(origin=(-13.59326674, 7.238305373, 5.539977771), z_dir=(1, 0, 0)), keep=Keep.TOP, mode=Mode.PRIVATE)
    add(chamfer1_piece_16)
    with BuildSketch(Plane(origin=(-13.62164122, 5, 9.316822292), x_dir=(-0.20040457203505713, -0.02749587661058635, 0.9793273121264724), z_dir=(0.9796977192661681, 0, 0.2004803702726742))) as chamfer1_piece_17_section:
        Polygon((CHAMFER1_SIZE * 0.999621916911, -CHAMFER1_SIZE * 0.0274958766106), (-CHAMFER1_SIZE * 0.0274958766106, -CHAMFER1_SIZE * 0.999621916911), (0, 0), align=None)
    chamfer1_piece_17 = extrude(amount=34.022473516, mode=Mode.PRIVATE)
    chamfer1_piece_17 = split(chamfer1_piece_17, bisect_by=Plane(origin=(1.998871884, 7.238305373, 14.542103203), z_dir=(-0.5000000000000007, 0, -0.8660254037844384)), keep=Keep.TOP, mode=Mode.PRIVATE)
    chamfer1_piece_17 = split(chamfer1_piece_17, bisect_by=Plane(origin=(0.888096553, 7.238305373, 13.461771649), z_dir=(0.8660254037844388, 0, 0.49999999999999983)), keep=Keep.TOP, mode=Mode.PRIVATE)
    chamfer1_piece_17 = split(chamfer1_piece_17, bisect_by=Plane(origin=(2.225758955, 7.238305373, 12.832047916), z_dir=(-0.4999999999999998, 0, 0.8660254037844388)), keep=Keep.TOP, mode=Mode.PRIVATE)
    add(chamfer1_piece_17)
    with BuildSketch(Plane(origin=(-13.62164122, 5, 9.316822292), x_dir=(-0.20040457203505713, -0.02749587661058635, 0.9793273121264724), z_dir=(0.9796977192661681, 0, 0.2004803702726742))) as chamfer1_piece_18_section:
        Polygon((CHAMFER1_SIZE * 0.999621916911, -CHAMFER1_SIZE * 0.0274958766106), (-CHAMFER1_SIZE * 0.0274958766106, -CHAMFER1_SIZE * 0.999621916911), (0, 0), align=None)
    chamfer1_piece_18 = extrude(amount=34.022473516, mode=Mode.PRIVATE)
    chamfer1_piece_18 = split(chamfer1_piece_18, bisect_by=Plane(origin=(3.593667704, 8.044690519, 13.621347406), z_dir=(-0.5000000000000007, 0, -0.8660254037844384)), keep=Keep.TOP, mode=Mode.PRIVATE)
    chamfer1_piece_18 = split(chamfer1_piece_18, bisect_by=Plane(origin=(4.298073033, 8.044690519, 13.555519133), z_dir=(-0.8660254037844388, 0, -0.49999999999999983)), keep=Keep.TOP, mode=Mode.PRIVATE)
    chamfer1_piece_18 = split(chamfer1_piece_18, bisect_by=Plane(origin=(1.699996821, 8.044690519, 12.055519133), z_dir=(0.8660254037844388, 0, 0.49999999999999983)), keep=Keep.TOP, mode=Mode.PRIVATE)
    chamfer1_piece_18 = split(chamfer1_piece_18, bisect_by=Plane(origin=(2.97964979, 8.044690519, 13.267306992), z_dir=(0.4999999999999998, 0, -0.8660254037844388)), keep=Keep.TOP, mode=Mode.PRIVATE)
    add(chamfer1_piece_18)
    with BuildSketch(Plane(origin=(-13.62164122, 5, 9.316822292), x_dir=(-0.20040457203505713, -0.02749587661058635, 0.9793273121264724), z_dir=(0.9796977192661681, 0, 0.2004803702726742))) as chamfer1_piece_19_section:
        Polygon((CHAMFER1_SIZE * 0.999621916911, -CHAMFER1_SIZE * 0.0274958766106), (-CHAMFER1_SIZE * 0.0274958766106, -CHAMFER1_SIZE * 0.999621916911), (0, 0), align=None)
    chamfer1_piece_19 = extrude(amount=34.022473516, mode=Mode.PRIVATE)
    chamfer1_piece_19 = split(chamfer1_piece_19, bisect_by=Plane(origin=(1.330348254, 6.348975917, 14.9280755), z_dir=(0.5000000000000007, 0, 0.8660254037844384)), keep=Keep.TOP, mode=Mode.PRIVATE)
    chamfer1_piece_19 = split(chamfer1_piece_19, bisect_by=Plane(origin=(2.739314193, 6.348975917, 16.255368639), z_dir=(-0.8660254037844388, 0, -0.49999999999999983)), keep=Keep.TOP, mode=Mode.PRIVATE)
    chamfer1_piece_19 = split(chamfer1_piece_19, bisect_by=Plane(origin=(0.141237982, 6.348975917, 14.755368639), z_dir=(0.8660254037844388, 0, 0.49999999999999983)), keep=Keep.TOP, mode=Mode.PRIVATE)
    chamfer1_piece_19 = split(chamfer1_piece_19, bisect_by=Plane(origin=(3.129287407, 6.348975917, 13.353700311), z_dir=(-0.4999999999999998, 0, 0.8660254037844388)), keep=Keep.TOP, mode=Mode.PRIVATE)
    add(chamfer1_piece_19)
    with BuildSketch(Plane(origin=(-13.62164122, 5, 9.316822292), x_dir=(-0.20040457203505713, -0.02749587661058635, 0.9793273121264724), z_dir=(0.9796977192661681, 0, 0.2004803702726742))) as chamfer1_piece_20_section:
        Polygon((CHAMFER1_SIZE * 0.999621916911, -CHAMFER1_SIZE * 0.0274958766106), (-CHAMFER1_SIZE * 0.0274958766106, -CHAMFER1_SIZE * 0.999621916911), (0, 0), align=None)
    chamfer1_piece_20 = extrude(amount=34.022473516, mode=Mode.PRIVATE)
    chamfer1_piece_20 = split(chamfer1_piece_20, bisect_by=Plane(origin=(4.017250886, 7.664220287, 13.376791542), z_dir=(0.5000000000000007, 0, 0.8660254037844384)), keep=Keep.TOP, mode=Mode.PRIVATE)
    chamfer1_piece_20 = split(chamfer1_piece_20, bisect_by=Plane(origin=(4.264314123, 7.664220287, 13.61399128), z_dir=(-0.8660254037844388, 0, -0.49999999999999983)), keep=Keep.TOP, mode=Mode.PRIVATE)
    chamfer1_piece_20 = split(chamfer1_piece_20, bisect_by=Plane(origin=(3.928092882, 7.664220287, 13.814890867), z_dir=(0.4999999999999998, 0, -0.8660254037844388)), keep=Keep.TOP, mode=Mode.PRIVATE)
    add(chamfer1_piece_20)
    with BuildSketch(Plane(origin=(4.120574603, 5, 25.138276191), x_dir=(0.9483246169389855, -0.027495876610586348, 0.316108205646329), z_dir=(0.31622776601683844, 0, -0.9486832980505137))) as chamfer1_piece_21_section:
        Polygon((CHAMFER1_SIZE * 0.999621916911, -CHAMFER1_SIZE * 0.0274958766106), (-CHAMFER1_SIZE * 0.0274958766106, -CHAMFER1_SIZE * 0.999621916911), (0, 0), align=None)
    chamfer1_piece_21 = extrude(amount=34.022473516, mode=Mode.PRIVATE)
    chamfer1_piece_21 = split(chamfer1_piece_21, bisect_by=Plane(origin=(10, 7.664220287, 10.309273658), z_dir=(-1, 0, 0)), keep=Keep.TOP, mode=Mode.PRIVATE)
    chamfer1_piece_21 = split(chamfer1_piece_21, bisect_by=Plane(origin=(9.657905234, 7.664220287, 10.5), z_dir=(0, 0, -1)), keep=Keep.TOP, mode=Mode.PRIVATE)
    chamfer1_piece_21 = split(chamfer1_piece_21, bisect_by=Plane(origin=(9.576015854, 7.664220287, 10.167437092), z_dir=(0.5000000000000007, 0, 0.8660254037844384)), keep=Keep.TOP, mode=Mode.PRIVATE)
    add(chamfer1_piece_21)
    with BuildSketch(Plane(origin=(4.120574603, 5, 25.138276191), x_dir=(0.9483246169389855, -0.027495876610586348, 0.316108205646329), z_dir=(0.31622776601683844, 0, -0.9486832980505137))) as chamfer1_piece_22_section:
        Polygon((CHAMFER1_SIZE * 0.999621916911, -CHAMFER1_SIZE * 0.0274958766106), (-CHAMFER1_SIZE * 0.0274958766106, -CHAMFER1_SIZE * 0.999621916911), (0, 0), align=None)
    chamfer1_piece_22 = extrude(amount=34.022473516, mode=Mode.PRIVATE)
    chamfer1_piece_22 = split(chamfer1_piece_22, bisect_by=Plane(origin=(10, 8.044690519, 9.214105908), z_dir=(-1, 0, 0)), keep=Keep.TOP, mode=Mode.PRIVATE)
    chamfer1_piece_22 = split(chamfer1_piece_22, bisect_by=Plane(origin=(9.590387414, 8.044690519, 7.5), z_dir=(0, 0, 1)), keep=Keep.TOP, mode=Mode.PRIVATE)
    chamfer1_piece_22 = split(chamfer1_piece_22, bisect_by=Plane(origin=(9.590387414, 8.044690519, 10.5), z_dir=(0, 0, -1)), keep=Keep.TOP, mode=Mode.PRIVATE)
    chamfer1_piece_22 = split(chamfer1_piece_22, bisect_by=Plane(origin=(9.999599036, 8.044690519, 9.922881228), z_dir=(-0.5000000000000007, 0, -0.8660254037844384)), keep=Keep.TOP, mode=Mode.PRIVATE)
    add(chamfer1_piece_22)
    with BuildSketch(Plane(origin=(4.120574603, 5, 25.138276191), x_dir=(0.9483246169389855, -0.027495876610586348, 0.316108205646329), z_dir=(0.31622776601683844, 0, -0.9486832980505137))) as chamfer1_piece_23_section:
        Polygon((CHAMFER1_SIZE * 0.999621916911, -CHAMFER1_SIZE * 0.0274958766106), (-CHAMFER1_SIZE * 0.0274958766106, -CHAMFER1_SIZE * 0.999621916911), (0, 0), align=None)
    chamfer1_piece_23 = extrude(amount=34.022473516, mode=Mode.PRIVATE)
    chamfer1_piece_23 = split(chamfer1_piece_23, bisect_by=Plane(origin=(10, 6.348975917, 9.386892546), z_dir=(1, 0, 0)), keep=Keep.TOP, mode=Mode.PRIVATE)
    chamfer1_piece_23 = split(chamfer1_piece_23, bisect_by=Plane(origin=(12.707905093, 6.348975917, 7.5), z_dir=(0, 0, 1)), keep=Keep.TOP, mode=Mode.PRIVATE)
    chamfer1_piece_23 = split(chamfer1_piece_23, bisect_by=Plane(origin=(12.707905093, 6.348975917, 10.5), z_dir=(0, 0, -1)), keep=Keep.TOP, mode=Mode.PRIVATE)
    chamfer1_piece_23 = split(chamfer1_piece_23, bisect_by=Plane(origin=(12.262918486, 6.348975917, 8.616153134), z_dir=(0.5000000000000007, 0, 0.8660254037844384)), keep=Keep.TOP, mode=Mode.PRIVATE)
    add(chamfer1_piece_23)
    with BuildSketch(Plane(origin=(4.120574603, 5, 25.138276191), x_dir=(0.9483246169389855, -0.027495876610586348, 0.316108205646329), z_dir=(0.31622776601683844, 0, -0.9486832980505137))) as chamfer1_piece_24_section:
        Polygon((CHAMFER1_SIZE * 0.999621916911, -CHAMFER1_SIZE * 0.0274958766106), (-CHAMFER1_SIZE * 0.0274958766106, -CHAMFER1_SIZE * 0.999621916911), (0, 0), align=None)
    chamfer1_piece_24 = extrude(amount=34.022473516, mode=Mode.PRIVATE)
    chamfer1_piece_24 = split(chamfer1_piece_24, bisect_by=Plane(origin=(10, 7.238305373, 8.343587756), z_dir=(1, 0, 0)), keep=Keep.TOP, mode=Mode.PRIVATE)
    chamfer1_piece_24 = split(chamfer1_piece_24, bisect_by=Plane(origin=(11.214187952, 7.238305373, 7.5), z_dir=(0, 0, 1)), keep=Keep.TOP, mode=Mode.PRIVATE)
    chamfer1_piece_24 = split(chamfer1_piece_24, bisect_by=Plane(origin=(11.594394856, 7.238305373, 9.002125431), z_dir=(-0.5000000000000007, 0, -0.8660254037844384)), keep=Keep.TOP, mode=Mode.PRIVATE)
    add(chamfer1_piece_24)

    # Fillet1
    fillet1_edges = [part.edges().sort_by_distance(p)[0] for p in [
        (-3.205771366, -5, 23.552558883),
        (-18.794228634, -5, 14.552558883),
        (-18.794228634, -5, -14.552558883),
        (-3.205771366, -5, -23.552558883),
        (22, -5, -9),
        (22, -5, 9),
    ]]
    fillet(fillet1_edges, radius=FILLET1_R)

    # Sketch6 → Cut-Extrude2 (cut, symmetric)
    with BuildSketch(Plane.XY):
        with Locations((14.9, 0)):
            Circle(SKETCH6_R)
    cut_extrude2 = extrude(amount=CUT_EXTRUDE2_DEPTH, both=True, mode=Mode.SUBTRACT)

    # CirPattern1: Cut-Extrude1, Cut-Extrude2 ×3 about axis
    cirpattern1_axis = Axis((0, 0, 0), (0, 1, 0))
    add([cut_extrude1.rotate(cirpattern1_axis, i * 360 / CIRPATTERN1_COUNT) for i in range(1, CIRPATTERN1_COUNT)], mode=Mode.SUBTRACT)
    add([cut_extrude2.rotate(cirpattern1_axis, i * 360 / CIRPATTERN1_COUNT) for i in range(1, CIRPATTERN1_COUNT)], mode=Mode.SUBTRACT)


solid = part.part
